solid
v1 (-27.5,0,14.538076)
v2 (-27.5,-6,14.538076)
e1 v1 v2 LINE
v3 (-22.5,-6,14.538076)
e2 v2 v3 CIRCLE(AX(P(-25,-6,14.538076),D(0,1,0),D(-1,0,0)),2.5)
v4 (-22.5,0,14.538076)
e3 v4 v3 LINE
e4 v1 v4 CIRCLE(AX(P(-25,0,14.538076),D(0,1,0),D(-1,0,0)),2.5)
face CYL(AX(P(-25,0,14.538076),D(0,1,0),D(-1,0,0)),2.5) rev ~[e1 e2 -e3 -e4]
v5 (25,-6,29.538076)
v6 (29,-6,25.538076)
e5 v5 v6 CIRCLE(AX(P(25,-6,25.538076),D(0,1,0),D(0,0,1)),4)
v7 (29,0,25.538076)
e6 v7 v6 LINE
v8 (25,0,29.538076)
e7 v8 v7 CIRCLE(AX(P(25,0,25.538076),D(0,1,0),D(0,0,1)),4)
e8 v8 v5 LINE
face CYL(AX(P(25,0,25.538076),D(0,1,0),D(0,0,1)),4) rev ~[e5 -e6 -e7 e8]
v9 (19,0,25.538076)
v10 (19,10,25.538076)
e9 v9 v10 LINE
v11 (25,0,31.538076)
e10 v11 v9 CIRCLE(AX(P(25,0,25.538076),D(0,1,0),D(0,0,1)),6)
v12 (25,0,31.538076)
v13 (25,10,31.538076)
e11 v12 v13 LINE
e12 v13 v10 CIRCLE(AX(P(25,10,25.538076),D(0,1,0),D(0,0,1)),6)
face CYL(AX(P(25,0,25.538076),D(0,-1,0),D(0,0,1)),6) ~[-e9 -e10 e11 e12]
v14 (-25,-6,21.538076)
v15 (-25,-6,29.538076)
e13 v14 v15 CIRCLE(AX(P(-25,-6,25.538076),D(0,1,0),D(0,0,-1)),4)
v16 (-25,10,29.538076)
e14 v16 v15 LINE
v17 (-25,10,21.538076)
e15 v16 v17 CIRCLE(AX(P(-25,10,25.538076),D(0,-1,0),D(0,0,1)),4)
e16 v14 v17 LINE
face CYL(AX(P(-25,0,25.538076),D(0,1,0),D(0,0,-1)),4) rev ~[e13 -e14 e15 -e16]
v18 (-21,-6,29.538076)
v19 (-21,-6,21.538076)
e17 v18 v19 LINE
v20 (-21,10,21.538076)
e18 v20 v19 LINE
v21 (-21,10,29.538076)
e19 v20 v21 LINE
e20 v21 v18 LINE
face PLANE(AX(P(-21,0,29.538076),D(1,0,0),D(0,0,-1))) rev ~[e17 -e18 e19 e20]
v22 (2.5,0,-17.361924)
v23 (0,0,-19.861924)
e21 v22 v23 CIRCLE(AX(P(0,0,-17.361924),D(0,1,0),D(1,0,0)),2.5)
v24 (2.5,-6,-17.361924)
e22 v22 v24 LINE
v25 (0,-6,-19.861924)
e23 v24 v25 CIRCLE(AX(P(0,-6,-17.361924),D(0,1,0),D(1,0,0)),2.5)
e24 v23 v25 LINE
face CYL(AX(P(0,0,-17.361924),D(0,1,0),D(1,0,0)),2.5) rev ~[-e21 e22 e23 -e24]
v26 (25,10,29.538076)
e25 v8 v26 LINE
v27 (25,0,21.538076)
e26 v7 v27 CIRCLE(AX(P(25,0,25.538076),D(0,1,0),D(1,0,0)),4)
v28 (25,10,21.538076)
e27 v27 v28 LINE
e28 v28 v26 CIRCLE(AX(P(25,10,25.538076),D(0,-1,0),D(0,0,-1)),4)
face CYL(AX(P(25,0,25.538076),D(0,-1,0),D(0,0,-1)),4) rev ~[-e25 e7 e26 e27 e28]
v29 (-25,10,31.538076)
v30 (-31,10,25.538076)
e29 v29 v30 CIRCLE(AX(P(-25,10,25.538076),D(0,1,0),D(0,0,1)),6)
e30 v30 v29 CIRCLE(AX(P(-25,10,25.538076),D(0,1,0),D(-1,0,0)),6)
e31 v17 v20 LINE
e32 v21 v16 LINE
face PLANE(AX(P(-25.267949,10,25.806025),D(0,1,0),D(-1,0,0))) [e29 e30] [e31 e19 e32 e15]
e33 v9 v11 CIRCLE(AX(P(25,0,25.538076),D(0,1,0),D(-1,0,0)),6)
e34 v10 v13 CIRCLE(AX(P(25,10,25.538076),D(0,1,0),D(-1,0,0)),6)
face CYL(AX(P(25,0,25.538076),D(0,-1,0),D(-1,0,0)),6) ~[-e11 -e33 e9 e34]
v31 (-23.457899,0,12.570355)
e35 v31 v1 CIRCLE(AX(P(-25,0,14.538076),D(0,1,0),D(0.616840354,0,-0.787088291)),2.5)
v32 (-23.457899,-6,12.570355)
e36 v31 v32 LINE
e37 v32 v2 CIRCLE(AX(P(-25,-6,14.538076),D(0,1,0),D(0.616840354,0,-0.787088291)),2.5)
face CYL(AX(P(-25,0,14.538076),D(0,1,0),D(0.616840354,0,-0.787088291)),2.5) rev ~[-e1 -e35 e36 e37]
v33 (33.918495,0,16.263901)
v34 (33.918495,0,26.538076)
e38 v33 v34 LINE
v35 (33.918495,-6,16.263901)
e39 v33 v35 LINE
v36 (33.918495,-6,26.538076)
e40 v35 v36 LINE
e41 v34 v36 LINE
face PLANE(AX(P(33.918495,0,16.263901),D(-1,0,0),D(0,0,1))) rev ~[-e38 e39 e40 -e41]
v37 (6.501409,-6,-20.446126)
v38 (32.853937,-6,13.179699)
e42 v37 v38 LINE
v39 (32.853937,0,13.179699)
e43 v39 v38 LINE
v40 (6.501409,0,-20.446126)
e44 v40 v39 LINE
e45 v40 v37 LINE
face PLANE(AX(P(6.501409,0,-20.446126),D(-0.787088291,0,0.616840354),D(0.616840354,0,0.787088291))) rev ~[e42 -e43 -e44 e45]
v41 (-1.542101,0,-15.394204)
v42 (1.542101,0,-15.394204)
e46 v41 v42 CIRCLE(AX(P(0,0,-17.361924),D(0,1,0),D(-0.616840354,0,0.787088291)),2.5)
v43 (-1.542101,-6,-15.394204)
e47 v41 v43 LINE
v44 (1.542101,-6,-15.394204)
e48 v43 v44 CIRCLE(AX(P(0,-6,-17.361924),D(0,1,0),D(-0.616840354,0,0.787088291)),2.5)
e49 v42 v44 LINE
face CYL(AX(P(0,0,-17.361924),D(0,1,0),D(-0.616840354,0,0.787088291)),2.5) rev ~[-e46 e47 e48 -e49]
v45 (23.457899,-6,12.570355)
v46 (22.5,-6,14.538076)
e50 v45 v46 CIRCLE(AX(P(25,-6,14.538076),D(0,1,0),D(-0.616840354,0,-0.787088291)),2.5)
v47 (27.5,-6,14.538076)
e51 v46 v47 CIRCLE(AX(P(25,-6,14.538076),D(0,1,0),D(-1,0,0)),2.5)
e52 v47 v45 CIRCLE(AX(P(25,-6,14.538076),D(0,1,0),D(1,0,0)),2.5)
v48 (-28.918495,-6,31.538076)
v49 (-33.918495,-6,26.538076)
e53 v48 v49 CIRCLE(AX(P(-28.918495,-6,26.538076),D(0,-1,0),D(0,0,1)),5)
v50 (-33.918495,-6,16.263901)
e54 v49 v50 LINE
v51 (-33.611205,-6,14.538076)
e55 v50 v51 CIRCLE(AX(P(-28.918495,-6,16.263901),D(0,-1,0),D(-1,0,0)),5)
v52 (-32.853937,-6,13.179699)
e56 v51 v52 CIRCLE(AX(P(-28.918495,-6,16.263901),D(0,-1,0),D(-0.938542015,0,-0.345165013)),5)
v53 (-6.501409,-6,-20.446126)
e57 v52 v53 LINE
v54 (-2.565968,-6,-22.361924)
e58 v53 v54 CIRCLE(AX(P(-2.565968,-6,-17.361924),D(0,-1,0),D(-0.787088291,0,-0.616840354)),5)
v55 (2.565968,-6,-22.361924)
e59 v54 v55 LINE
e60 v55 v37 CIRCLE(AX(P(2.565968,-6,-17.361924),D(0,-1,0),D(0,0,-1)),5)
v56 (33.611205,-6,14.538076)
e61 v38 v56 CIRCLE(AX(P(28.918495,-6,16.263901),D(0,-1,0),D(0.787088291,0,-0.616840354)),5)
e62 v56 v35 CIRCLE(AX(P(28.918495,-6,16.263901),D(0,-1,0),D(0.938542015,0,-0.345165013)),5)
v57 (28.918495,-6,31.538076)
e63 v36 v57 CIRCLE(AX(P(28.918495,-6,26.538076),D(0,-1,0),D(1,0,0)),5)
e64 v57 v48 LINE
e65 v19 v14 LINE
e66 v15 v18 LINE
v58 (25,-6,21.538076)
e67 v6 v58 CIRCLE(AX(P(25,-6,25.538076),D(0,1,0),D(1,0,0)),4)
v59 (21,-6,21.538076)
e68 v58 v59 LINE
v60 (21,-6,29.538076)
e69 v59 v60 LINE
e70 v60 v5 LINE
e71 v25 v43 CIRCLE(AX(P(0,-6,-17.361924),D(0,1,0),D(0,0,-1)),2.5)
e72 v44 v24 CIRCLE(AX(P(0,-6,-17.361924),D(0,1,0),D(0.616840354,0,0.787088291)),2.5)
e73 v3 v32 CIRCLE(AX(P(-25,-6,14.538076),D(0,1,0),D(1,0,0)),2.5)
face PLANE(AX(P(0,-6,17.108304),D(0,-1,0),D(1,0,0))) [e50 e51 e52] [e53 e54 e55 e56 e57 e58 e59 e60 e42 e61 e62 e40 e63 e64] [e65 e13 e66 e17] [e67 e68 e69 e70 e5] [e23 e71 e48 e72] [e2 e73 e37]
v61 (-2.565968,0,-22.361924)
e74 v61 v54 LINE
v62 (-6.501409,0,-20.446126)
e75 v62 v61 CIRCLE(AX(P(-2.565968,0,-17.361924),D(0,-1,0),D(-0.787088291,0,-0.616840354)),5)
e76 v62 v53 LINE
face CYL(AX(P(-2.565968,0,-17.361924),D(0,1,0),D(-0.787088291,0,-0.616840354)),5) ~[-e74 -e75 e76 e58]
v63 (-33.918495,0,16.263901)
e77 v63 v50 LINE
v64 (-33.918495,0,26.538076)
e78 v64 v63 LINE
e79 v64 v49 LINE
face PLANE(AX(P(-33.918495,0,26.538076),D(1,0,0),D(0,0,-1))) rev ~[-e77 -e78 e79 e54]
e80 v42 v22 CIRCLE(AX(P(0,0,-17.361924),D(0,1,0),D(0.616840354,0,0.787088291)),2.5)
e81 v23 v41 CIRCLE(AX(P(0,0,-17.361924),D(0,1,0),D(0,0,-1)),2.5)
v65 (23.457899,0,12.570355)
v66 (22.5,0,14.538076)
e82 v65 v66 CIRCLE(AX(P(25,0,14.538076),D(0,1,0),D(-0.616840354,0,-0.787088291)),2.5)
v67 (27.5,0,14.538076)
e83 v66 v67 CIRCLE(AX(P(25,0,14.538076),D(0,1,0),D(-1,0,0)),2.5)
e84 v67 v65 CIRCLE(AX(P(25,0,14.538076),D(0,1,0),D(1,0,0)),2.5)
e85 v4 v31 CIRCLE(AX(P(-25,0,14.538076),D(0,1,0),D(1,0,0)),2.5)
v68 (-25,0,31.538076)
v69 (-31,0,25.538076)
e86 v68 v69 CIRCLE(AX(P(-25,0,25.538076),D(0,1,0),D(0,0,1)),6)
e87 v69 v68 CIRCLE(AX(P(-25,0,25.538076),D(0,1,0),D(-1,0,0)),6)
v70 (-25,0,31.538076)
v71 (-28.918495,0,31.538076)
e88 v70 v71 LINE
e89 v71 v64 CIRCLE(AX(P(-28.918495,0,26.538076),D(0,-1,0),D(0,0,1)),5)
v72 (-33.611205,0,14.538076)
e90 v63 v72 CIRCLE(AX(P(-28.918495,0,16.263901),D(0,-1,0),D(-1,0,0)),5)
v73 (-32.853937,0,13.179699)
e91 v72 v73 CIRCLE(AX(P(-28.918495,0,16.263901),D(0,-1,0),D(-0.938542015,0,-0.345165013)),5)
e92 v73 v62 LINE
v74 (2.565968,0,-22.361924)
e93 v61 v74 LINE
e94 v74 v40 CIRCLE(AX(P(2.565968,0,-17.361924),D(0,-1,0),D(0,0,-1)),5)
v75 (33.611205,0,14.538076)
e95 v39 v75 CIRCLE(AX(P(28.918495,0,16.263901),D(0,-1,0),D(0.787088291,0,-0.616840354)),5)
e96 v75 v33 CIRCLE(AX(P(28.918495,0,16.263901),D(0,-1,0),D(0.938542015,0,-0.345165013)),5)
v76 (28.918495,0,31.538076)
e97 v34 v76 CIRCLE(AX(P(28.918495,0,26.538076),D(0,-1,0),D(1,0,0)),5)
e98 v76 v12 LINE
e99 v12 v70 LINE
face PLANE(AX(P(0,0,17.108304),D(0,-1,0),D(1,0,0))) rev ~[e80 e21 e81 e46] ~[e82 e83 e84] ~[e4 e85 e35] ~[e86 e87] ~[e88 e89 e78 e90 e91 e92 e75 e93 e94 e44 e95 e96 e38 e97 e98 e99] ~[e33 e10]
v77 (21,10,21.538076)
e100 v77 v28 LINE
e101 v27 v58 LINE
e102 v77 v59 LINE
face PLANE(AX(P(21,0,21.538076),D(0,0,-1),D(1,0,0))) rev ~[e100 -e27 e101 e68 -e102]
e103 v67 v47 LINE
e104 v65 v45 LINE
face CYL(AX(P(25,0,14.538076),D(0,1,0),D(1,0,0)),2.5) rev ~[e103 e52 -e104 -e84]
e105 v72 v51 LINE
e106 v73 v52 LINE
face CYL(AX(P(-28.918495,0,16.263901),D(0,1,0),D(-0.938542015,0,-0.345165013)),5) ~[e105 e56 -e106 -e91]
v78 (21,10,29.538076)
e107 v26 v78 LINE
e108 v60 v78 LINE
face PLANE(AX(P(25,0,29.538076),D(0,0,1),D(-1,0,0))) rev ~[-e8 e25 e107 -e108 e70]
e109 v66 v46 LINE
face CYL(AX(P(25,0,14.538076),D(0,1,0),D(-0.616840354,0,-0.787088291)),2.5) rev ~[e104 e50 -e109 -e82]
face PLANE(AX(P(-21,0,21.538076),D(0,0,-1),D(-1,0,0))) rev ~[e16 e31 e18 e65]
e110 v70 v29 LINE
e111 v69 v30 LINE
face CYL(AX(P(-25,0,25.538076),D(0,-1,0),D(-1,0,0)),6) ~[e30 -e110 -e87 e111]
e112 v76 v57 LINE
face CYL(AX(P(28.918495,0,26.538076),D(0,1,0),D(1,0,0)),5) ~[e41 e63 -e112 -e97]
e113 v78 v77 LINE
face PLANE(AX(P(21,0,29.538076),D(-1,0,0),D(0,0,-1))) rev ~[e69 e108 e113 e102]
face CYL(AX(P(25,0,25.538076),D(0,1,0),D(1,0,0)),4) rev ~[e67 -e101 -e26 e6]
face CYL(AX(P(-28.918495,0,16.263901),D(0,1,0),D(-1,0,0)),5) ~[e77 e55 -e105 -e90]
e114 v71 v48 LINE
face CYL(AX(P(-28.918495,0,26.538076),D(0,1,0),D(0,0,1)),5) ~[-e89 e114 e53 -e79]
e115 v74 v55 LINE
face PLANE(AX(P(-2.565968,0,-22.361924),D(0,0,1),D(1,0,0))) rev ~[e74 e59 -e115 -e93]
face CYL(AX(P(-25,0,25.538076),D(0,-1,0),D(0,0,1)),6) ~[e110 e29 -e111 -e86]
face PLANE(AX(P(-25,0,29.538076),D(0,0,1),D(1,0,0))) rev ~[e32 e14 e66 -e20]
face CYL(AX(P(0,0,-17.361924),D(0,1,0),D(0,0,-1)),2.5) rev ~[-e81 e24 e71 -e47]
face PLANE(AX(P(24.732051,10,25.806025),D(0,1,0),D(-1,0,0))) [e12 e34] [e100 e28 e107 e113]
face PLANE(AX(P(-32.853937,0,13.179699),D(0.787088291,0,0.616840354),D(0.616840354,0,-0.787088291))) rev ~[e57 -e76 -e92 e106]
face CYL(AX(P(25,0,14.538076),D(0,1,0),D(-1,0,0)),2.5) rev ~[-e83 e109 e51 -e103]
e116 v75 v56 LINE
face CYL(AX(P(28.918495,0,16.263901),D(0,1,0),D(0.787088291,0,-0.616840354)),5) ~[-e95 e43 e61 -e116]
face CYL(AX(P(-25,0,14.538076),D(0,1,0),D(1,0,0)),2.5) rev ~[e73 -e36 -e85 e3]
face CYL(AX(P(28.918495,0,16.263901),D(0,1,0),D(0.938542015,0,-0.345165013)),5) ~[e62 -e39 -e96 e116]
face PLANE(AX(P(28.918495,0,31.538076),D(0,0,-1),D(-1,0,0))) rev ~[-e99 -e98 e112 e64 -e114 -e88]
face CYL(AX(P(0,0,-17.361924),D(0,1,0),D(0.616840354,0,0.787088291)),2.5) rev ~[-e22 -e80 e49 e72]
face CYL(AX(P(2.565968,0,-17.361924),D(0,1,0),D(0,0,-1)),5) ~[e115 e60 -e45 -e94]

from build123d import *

# Parameters (mm, degrees)
F1_DEPTH = 6
F3_DEPTH = 10


with BuildPart() as f1:
    # F0 (on Front) → F1 (new body)
    with BuildSketch(Plane.XZ):
        with BuildLine():
            Line((-22.5, 14.5380757153), (-15.95, 14.5380757153))
            Line((-15.95, 14.5380757153), (15.95, 14.5380757153))
            Line((15.95, 14.5380757153), (22.5, 14.5380757153))
            ThreePointArc((22.5, 14.5380757153), (25, 17.0380757153), (27.5, 14.5380757153))
            Line((27.5, 14.5380757153), (33.6112053721, 14.5380757153))
            ThreePointArc((33.6112053721, 14.5380757153), (33.8410734014, 15.3874164322), (33.9184952978, 16.2639007813))
            Line((33.9184952978, 16.2639007813), (33.9184952978, 19.5380757153))
            Line((33.9184952978, 19.5380757153), (25, 19.5380757153))
            Line((25, 19.5380757153), (-25, 19.5380757153))
            Line((-25, 19.5380757153), (-33.9184952978, 19.5380757153))
            Line((-33.9184952978, 19.5380757153), (-33.9184952978, 16.2639007813))
            ThreePointArc((-33.9184952978, 16.2639007813), (-33.8410734014, 15.3874164322), (-33.6112053721, 14.5380757153))
            Line((-33.6112053721, 14.5380757153), (-27.5, 14.5380757153))
            ThreePointArc((-27.5, 14.5380757153), (-25, 17.0380757153), (-22.5, 14.5380757153))
        make_face()
        with BuildLine():
            Line((15.95, 14.5380757153), (-15.95, 14.5380757153))
            Line((-15.95, 14.5380757153), (-22.5, 14.5380757153))
            ThreePointArc((-22.5, 14.5380757153), (-22.7521952698, 13.4438299043), (-23.457899116, 12.5703549873))
            Line((-23.457899116, 12.5703549873), (-1.542100884, -15.3942035567))
            ThreePointArc((-1.542100884, -15.3942035567), (0, -14.8619242847), (1.542100884, -15.3942035567))
            Line((1.542100884, -15.3942035567), (23.457899116, 12.5703549873))
            ThreePointArc((23.457899116, 12.5703549873), (22.7521952698, 13.4438299043), (22.5, 14.5380757153))
            Line((22.5, 14.5380757153), (15.95, 14.5380757153))
        make_face()
        with BuildLine():
            ThreePointArc((-23.457899116, 12.5703549873), (-26.094245811, 12.2902709851), (-27.5, 14.5380757153))
            Line((-27.5, 14.5380757153), (-33.6112053721, 14.5380757153))
            ThreePointArc((-33.6112053721, 14.5380757153), (-33.28570797, 13.8292645711), (-32.8539367538, 13.1796990132))
            Line((-32.8539367538, 13.1796990132), (-6.5014092727, -20.4461260528))
            ThreePointArc((-6.5014092727, -20.4461260528), (-4.7544594387, -21.8575337451), (-2.5659678166, -22.3619242847))
            Line((-2.5659678166, -22.3619242847), (0, -22.3619242847))
            Line((0, -22.3619242847), (0, -19.8619242847))
            ThreePointArc((0, -19.8619242847), (-2.3631866008, -18.1776136189), (-1.542100884, -15.3942035567))
            Line((-1.542100884, -15.3942035567), (-23.457899116, 12.5703549873))
        make_face()
        with BuildLine():
            Line((33.6112053721, 14.5380757153), (27.5, 14.5380757153))
            ThreePointArc((27.5, 14.5380757153), (26.094245811, 12.2902709851), (23.457899116, 12.5703549873))
            Line((23.457899116, 12.5703549873), (1.542100884, -15.3942035567))
            ThreePointArc((1.542100884, -15.3942035567), (2.2478047302, -16.2676784737), (2.5, -17.3619242847))
            ThreePointArc((2.5, -17.3619242847), (1.767766953, -19.1296912377), (0, -19.8619242847))
            Line((0, -19.8619242847), (0, -22.3619242847))
            Line((0, -22.3619242847), (2.5659678166, -22.3619242847))
            ThreePointArc((2.5659678166, -22.3619242847), (4.7544594387, -21.8575337451), (6.5014092727, -20.4461260528))
            Line((6.5014092727, -20.4461260528), (32.8539367538, 13.1796990132))
            ThreePointArc((32.8539367538, 13.1796990132), (33.28570797, 13.8292645711), (33.6112053721, 14.5380757153))
        make_face()
        with BuildLine():
            Line((-33.9184952978, 26.5380757153), (-33.9184952978, 19.5380757153))
            Line((-33.9184952978, 19.5380757153), (-25, 19.5380757153))
            Line((-25, 19.5380757153), (-25, 21.5380757153))
            ThreePointArc((-25, 21.5380757153), (-29, 25.5380757153), (-25, 29.5380757153))
            Line((-25, 29.5380757153), (-25, 31.5380757153))
            Line((-25, 31.5380757153), (-28.9184952978, 31.5380757153))
            ThreePointArc((-28.9184952978, 31.5380757153), (-32.4540292037, 30.0736096212), (-33.9184952978, 26.5380757153))
        make_face()
        with BuildLine():
            Line((25, 19.5380757153), (33.9184952978, 19.5380757153))
            Line((33.9184952978, 19.5380757153), (33.9184952978, 26.5380757153))
            ThreePointArc((33.9184952978, 26.5380757153), (32.4540292037, 30.0736096212), (28.9184952978, 31.5380757153))
            Line((28.9184952978, 31.5380757153), (25, 31.5380757153))
            Line((25, 31.5380757153), (25, 29.5380757153))
            ThreePointArc((25, 29.5380757153), (27.8284271247, 28.36650284), (29, 25.5380757153))
            ThreePointArc((29, 25.5380757153), (27.8284271247, 22.7096485906), (25, 21.5380757153))
            Line((25, 21.5380757153), (25, 19.5380757153))
        make_face()
        Polygon((-25, 21.5380757153), (-25, 19.5380757153), (25, 19.5380757153), (25, 21.5380757153), (21, 21.5380757153), (21, 25.5380757153), (21, 29.5380757153), (25, 29.5380757153), (25, 31.5380757153), (-25, 31.5380757153), (-25, 29.5380757153), (-21, 29.5380757153), (-21, 25.5380757153), (-21, 21.5380757153), align=None)
    extrude(amount=F1_DEPTH)

    # F2 (on face) → F3 (join)
    with BuildSketch(Plane(origin=(0, 0, 0), x_dir=(-1, 0, 0), z_dir=(0, 1, 0))):
        with BuildLine():
            ThreePointArc((-25, 31.5380757153), (-29.2426406871, 21.2954350282), (-19, 25.5380757153))
            ThreePointArc((-19, 25.5380757153), (-20.7573593129, 29.7807164024), (-25, 31.5380757153))
        make_face()
        with BuildLine():
            Line((-21, 29.5380757153), (-21, 21.5380757153))
            Line((-21, 21.5380757153), (-25, 21.5380757153))
            ThreePointArc((-25, 21.5380757153), (-29, 25.5380757153), (-25, 29.5380757153))
            Line((-25, 29.5380757153), (-21, 29.5380757153))
        make_face(mode=Mode.SUBTRACT)
        with BuildLine():
            ThreePointArc((31, 25.5380757153), (29.2426406871, 29.7807164024), (25, 31.5380757153))
            ThreePointArc((25, 31.5380757153), (20.7573593129, 21.2954350282), (31, 25.5380757153))
        make_face()
        with BuildLine():
            Line((21, 29.5380757153), (25, 29.5380757153))
            ThreePointArc((25, 29.5380757153), (29, 25.5380757153), (25, 21.5380757153))
            Line((25, 21.5380757153), (21, 21.5380757153))
            Line((21, 21.5380757153), (21, 29.5380757153))
        make_face(mode=Mode.SUBTRACT)
    extrude(amount=F3_DEPTH)


solid = f1.part
